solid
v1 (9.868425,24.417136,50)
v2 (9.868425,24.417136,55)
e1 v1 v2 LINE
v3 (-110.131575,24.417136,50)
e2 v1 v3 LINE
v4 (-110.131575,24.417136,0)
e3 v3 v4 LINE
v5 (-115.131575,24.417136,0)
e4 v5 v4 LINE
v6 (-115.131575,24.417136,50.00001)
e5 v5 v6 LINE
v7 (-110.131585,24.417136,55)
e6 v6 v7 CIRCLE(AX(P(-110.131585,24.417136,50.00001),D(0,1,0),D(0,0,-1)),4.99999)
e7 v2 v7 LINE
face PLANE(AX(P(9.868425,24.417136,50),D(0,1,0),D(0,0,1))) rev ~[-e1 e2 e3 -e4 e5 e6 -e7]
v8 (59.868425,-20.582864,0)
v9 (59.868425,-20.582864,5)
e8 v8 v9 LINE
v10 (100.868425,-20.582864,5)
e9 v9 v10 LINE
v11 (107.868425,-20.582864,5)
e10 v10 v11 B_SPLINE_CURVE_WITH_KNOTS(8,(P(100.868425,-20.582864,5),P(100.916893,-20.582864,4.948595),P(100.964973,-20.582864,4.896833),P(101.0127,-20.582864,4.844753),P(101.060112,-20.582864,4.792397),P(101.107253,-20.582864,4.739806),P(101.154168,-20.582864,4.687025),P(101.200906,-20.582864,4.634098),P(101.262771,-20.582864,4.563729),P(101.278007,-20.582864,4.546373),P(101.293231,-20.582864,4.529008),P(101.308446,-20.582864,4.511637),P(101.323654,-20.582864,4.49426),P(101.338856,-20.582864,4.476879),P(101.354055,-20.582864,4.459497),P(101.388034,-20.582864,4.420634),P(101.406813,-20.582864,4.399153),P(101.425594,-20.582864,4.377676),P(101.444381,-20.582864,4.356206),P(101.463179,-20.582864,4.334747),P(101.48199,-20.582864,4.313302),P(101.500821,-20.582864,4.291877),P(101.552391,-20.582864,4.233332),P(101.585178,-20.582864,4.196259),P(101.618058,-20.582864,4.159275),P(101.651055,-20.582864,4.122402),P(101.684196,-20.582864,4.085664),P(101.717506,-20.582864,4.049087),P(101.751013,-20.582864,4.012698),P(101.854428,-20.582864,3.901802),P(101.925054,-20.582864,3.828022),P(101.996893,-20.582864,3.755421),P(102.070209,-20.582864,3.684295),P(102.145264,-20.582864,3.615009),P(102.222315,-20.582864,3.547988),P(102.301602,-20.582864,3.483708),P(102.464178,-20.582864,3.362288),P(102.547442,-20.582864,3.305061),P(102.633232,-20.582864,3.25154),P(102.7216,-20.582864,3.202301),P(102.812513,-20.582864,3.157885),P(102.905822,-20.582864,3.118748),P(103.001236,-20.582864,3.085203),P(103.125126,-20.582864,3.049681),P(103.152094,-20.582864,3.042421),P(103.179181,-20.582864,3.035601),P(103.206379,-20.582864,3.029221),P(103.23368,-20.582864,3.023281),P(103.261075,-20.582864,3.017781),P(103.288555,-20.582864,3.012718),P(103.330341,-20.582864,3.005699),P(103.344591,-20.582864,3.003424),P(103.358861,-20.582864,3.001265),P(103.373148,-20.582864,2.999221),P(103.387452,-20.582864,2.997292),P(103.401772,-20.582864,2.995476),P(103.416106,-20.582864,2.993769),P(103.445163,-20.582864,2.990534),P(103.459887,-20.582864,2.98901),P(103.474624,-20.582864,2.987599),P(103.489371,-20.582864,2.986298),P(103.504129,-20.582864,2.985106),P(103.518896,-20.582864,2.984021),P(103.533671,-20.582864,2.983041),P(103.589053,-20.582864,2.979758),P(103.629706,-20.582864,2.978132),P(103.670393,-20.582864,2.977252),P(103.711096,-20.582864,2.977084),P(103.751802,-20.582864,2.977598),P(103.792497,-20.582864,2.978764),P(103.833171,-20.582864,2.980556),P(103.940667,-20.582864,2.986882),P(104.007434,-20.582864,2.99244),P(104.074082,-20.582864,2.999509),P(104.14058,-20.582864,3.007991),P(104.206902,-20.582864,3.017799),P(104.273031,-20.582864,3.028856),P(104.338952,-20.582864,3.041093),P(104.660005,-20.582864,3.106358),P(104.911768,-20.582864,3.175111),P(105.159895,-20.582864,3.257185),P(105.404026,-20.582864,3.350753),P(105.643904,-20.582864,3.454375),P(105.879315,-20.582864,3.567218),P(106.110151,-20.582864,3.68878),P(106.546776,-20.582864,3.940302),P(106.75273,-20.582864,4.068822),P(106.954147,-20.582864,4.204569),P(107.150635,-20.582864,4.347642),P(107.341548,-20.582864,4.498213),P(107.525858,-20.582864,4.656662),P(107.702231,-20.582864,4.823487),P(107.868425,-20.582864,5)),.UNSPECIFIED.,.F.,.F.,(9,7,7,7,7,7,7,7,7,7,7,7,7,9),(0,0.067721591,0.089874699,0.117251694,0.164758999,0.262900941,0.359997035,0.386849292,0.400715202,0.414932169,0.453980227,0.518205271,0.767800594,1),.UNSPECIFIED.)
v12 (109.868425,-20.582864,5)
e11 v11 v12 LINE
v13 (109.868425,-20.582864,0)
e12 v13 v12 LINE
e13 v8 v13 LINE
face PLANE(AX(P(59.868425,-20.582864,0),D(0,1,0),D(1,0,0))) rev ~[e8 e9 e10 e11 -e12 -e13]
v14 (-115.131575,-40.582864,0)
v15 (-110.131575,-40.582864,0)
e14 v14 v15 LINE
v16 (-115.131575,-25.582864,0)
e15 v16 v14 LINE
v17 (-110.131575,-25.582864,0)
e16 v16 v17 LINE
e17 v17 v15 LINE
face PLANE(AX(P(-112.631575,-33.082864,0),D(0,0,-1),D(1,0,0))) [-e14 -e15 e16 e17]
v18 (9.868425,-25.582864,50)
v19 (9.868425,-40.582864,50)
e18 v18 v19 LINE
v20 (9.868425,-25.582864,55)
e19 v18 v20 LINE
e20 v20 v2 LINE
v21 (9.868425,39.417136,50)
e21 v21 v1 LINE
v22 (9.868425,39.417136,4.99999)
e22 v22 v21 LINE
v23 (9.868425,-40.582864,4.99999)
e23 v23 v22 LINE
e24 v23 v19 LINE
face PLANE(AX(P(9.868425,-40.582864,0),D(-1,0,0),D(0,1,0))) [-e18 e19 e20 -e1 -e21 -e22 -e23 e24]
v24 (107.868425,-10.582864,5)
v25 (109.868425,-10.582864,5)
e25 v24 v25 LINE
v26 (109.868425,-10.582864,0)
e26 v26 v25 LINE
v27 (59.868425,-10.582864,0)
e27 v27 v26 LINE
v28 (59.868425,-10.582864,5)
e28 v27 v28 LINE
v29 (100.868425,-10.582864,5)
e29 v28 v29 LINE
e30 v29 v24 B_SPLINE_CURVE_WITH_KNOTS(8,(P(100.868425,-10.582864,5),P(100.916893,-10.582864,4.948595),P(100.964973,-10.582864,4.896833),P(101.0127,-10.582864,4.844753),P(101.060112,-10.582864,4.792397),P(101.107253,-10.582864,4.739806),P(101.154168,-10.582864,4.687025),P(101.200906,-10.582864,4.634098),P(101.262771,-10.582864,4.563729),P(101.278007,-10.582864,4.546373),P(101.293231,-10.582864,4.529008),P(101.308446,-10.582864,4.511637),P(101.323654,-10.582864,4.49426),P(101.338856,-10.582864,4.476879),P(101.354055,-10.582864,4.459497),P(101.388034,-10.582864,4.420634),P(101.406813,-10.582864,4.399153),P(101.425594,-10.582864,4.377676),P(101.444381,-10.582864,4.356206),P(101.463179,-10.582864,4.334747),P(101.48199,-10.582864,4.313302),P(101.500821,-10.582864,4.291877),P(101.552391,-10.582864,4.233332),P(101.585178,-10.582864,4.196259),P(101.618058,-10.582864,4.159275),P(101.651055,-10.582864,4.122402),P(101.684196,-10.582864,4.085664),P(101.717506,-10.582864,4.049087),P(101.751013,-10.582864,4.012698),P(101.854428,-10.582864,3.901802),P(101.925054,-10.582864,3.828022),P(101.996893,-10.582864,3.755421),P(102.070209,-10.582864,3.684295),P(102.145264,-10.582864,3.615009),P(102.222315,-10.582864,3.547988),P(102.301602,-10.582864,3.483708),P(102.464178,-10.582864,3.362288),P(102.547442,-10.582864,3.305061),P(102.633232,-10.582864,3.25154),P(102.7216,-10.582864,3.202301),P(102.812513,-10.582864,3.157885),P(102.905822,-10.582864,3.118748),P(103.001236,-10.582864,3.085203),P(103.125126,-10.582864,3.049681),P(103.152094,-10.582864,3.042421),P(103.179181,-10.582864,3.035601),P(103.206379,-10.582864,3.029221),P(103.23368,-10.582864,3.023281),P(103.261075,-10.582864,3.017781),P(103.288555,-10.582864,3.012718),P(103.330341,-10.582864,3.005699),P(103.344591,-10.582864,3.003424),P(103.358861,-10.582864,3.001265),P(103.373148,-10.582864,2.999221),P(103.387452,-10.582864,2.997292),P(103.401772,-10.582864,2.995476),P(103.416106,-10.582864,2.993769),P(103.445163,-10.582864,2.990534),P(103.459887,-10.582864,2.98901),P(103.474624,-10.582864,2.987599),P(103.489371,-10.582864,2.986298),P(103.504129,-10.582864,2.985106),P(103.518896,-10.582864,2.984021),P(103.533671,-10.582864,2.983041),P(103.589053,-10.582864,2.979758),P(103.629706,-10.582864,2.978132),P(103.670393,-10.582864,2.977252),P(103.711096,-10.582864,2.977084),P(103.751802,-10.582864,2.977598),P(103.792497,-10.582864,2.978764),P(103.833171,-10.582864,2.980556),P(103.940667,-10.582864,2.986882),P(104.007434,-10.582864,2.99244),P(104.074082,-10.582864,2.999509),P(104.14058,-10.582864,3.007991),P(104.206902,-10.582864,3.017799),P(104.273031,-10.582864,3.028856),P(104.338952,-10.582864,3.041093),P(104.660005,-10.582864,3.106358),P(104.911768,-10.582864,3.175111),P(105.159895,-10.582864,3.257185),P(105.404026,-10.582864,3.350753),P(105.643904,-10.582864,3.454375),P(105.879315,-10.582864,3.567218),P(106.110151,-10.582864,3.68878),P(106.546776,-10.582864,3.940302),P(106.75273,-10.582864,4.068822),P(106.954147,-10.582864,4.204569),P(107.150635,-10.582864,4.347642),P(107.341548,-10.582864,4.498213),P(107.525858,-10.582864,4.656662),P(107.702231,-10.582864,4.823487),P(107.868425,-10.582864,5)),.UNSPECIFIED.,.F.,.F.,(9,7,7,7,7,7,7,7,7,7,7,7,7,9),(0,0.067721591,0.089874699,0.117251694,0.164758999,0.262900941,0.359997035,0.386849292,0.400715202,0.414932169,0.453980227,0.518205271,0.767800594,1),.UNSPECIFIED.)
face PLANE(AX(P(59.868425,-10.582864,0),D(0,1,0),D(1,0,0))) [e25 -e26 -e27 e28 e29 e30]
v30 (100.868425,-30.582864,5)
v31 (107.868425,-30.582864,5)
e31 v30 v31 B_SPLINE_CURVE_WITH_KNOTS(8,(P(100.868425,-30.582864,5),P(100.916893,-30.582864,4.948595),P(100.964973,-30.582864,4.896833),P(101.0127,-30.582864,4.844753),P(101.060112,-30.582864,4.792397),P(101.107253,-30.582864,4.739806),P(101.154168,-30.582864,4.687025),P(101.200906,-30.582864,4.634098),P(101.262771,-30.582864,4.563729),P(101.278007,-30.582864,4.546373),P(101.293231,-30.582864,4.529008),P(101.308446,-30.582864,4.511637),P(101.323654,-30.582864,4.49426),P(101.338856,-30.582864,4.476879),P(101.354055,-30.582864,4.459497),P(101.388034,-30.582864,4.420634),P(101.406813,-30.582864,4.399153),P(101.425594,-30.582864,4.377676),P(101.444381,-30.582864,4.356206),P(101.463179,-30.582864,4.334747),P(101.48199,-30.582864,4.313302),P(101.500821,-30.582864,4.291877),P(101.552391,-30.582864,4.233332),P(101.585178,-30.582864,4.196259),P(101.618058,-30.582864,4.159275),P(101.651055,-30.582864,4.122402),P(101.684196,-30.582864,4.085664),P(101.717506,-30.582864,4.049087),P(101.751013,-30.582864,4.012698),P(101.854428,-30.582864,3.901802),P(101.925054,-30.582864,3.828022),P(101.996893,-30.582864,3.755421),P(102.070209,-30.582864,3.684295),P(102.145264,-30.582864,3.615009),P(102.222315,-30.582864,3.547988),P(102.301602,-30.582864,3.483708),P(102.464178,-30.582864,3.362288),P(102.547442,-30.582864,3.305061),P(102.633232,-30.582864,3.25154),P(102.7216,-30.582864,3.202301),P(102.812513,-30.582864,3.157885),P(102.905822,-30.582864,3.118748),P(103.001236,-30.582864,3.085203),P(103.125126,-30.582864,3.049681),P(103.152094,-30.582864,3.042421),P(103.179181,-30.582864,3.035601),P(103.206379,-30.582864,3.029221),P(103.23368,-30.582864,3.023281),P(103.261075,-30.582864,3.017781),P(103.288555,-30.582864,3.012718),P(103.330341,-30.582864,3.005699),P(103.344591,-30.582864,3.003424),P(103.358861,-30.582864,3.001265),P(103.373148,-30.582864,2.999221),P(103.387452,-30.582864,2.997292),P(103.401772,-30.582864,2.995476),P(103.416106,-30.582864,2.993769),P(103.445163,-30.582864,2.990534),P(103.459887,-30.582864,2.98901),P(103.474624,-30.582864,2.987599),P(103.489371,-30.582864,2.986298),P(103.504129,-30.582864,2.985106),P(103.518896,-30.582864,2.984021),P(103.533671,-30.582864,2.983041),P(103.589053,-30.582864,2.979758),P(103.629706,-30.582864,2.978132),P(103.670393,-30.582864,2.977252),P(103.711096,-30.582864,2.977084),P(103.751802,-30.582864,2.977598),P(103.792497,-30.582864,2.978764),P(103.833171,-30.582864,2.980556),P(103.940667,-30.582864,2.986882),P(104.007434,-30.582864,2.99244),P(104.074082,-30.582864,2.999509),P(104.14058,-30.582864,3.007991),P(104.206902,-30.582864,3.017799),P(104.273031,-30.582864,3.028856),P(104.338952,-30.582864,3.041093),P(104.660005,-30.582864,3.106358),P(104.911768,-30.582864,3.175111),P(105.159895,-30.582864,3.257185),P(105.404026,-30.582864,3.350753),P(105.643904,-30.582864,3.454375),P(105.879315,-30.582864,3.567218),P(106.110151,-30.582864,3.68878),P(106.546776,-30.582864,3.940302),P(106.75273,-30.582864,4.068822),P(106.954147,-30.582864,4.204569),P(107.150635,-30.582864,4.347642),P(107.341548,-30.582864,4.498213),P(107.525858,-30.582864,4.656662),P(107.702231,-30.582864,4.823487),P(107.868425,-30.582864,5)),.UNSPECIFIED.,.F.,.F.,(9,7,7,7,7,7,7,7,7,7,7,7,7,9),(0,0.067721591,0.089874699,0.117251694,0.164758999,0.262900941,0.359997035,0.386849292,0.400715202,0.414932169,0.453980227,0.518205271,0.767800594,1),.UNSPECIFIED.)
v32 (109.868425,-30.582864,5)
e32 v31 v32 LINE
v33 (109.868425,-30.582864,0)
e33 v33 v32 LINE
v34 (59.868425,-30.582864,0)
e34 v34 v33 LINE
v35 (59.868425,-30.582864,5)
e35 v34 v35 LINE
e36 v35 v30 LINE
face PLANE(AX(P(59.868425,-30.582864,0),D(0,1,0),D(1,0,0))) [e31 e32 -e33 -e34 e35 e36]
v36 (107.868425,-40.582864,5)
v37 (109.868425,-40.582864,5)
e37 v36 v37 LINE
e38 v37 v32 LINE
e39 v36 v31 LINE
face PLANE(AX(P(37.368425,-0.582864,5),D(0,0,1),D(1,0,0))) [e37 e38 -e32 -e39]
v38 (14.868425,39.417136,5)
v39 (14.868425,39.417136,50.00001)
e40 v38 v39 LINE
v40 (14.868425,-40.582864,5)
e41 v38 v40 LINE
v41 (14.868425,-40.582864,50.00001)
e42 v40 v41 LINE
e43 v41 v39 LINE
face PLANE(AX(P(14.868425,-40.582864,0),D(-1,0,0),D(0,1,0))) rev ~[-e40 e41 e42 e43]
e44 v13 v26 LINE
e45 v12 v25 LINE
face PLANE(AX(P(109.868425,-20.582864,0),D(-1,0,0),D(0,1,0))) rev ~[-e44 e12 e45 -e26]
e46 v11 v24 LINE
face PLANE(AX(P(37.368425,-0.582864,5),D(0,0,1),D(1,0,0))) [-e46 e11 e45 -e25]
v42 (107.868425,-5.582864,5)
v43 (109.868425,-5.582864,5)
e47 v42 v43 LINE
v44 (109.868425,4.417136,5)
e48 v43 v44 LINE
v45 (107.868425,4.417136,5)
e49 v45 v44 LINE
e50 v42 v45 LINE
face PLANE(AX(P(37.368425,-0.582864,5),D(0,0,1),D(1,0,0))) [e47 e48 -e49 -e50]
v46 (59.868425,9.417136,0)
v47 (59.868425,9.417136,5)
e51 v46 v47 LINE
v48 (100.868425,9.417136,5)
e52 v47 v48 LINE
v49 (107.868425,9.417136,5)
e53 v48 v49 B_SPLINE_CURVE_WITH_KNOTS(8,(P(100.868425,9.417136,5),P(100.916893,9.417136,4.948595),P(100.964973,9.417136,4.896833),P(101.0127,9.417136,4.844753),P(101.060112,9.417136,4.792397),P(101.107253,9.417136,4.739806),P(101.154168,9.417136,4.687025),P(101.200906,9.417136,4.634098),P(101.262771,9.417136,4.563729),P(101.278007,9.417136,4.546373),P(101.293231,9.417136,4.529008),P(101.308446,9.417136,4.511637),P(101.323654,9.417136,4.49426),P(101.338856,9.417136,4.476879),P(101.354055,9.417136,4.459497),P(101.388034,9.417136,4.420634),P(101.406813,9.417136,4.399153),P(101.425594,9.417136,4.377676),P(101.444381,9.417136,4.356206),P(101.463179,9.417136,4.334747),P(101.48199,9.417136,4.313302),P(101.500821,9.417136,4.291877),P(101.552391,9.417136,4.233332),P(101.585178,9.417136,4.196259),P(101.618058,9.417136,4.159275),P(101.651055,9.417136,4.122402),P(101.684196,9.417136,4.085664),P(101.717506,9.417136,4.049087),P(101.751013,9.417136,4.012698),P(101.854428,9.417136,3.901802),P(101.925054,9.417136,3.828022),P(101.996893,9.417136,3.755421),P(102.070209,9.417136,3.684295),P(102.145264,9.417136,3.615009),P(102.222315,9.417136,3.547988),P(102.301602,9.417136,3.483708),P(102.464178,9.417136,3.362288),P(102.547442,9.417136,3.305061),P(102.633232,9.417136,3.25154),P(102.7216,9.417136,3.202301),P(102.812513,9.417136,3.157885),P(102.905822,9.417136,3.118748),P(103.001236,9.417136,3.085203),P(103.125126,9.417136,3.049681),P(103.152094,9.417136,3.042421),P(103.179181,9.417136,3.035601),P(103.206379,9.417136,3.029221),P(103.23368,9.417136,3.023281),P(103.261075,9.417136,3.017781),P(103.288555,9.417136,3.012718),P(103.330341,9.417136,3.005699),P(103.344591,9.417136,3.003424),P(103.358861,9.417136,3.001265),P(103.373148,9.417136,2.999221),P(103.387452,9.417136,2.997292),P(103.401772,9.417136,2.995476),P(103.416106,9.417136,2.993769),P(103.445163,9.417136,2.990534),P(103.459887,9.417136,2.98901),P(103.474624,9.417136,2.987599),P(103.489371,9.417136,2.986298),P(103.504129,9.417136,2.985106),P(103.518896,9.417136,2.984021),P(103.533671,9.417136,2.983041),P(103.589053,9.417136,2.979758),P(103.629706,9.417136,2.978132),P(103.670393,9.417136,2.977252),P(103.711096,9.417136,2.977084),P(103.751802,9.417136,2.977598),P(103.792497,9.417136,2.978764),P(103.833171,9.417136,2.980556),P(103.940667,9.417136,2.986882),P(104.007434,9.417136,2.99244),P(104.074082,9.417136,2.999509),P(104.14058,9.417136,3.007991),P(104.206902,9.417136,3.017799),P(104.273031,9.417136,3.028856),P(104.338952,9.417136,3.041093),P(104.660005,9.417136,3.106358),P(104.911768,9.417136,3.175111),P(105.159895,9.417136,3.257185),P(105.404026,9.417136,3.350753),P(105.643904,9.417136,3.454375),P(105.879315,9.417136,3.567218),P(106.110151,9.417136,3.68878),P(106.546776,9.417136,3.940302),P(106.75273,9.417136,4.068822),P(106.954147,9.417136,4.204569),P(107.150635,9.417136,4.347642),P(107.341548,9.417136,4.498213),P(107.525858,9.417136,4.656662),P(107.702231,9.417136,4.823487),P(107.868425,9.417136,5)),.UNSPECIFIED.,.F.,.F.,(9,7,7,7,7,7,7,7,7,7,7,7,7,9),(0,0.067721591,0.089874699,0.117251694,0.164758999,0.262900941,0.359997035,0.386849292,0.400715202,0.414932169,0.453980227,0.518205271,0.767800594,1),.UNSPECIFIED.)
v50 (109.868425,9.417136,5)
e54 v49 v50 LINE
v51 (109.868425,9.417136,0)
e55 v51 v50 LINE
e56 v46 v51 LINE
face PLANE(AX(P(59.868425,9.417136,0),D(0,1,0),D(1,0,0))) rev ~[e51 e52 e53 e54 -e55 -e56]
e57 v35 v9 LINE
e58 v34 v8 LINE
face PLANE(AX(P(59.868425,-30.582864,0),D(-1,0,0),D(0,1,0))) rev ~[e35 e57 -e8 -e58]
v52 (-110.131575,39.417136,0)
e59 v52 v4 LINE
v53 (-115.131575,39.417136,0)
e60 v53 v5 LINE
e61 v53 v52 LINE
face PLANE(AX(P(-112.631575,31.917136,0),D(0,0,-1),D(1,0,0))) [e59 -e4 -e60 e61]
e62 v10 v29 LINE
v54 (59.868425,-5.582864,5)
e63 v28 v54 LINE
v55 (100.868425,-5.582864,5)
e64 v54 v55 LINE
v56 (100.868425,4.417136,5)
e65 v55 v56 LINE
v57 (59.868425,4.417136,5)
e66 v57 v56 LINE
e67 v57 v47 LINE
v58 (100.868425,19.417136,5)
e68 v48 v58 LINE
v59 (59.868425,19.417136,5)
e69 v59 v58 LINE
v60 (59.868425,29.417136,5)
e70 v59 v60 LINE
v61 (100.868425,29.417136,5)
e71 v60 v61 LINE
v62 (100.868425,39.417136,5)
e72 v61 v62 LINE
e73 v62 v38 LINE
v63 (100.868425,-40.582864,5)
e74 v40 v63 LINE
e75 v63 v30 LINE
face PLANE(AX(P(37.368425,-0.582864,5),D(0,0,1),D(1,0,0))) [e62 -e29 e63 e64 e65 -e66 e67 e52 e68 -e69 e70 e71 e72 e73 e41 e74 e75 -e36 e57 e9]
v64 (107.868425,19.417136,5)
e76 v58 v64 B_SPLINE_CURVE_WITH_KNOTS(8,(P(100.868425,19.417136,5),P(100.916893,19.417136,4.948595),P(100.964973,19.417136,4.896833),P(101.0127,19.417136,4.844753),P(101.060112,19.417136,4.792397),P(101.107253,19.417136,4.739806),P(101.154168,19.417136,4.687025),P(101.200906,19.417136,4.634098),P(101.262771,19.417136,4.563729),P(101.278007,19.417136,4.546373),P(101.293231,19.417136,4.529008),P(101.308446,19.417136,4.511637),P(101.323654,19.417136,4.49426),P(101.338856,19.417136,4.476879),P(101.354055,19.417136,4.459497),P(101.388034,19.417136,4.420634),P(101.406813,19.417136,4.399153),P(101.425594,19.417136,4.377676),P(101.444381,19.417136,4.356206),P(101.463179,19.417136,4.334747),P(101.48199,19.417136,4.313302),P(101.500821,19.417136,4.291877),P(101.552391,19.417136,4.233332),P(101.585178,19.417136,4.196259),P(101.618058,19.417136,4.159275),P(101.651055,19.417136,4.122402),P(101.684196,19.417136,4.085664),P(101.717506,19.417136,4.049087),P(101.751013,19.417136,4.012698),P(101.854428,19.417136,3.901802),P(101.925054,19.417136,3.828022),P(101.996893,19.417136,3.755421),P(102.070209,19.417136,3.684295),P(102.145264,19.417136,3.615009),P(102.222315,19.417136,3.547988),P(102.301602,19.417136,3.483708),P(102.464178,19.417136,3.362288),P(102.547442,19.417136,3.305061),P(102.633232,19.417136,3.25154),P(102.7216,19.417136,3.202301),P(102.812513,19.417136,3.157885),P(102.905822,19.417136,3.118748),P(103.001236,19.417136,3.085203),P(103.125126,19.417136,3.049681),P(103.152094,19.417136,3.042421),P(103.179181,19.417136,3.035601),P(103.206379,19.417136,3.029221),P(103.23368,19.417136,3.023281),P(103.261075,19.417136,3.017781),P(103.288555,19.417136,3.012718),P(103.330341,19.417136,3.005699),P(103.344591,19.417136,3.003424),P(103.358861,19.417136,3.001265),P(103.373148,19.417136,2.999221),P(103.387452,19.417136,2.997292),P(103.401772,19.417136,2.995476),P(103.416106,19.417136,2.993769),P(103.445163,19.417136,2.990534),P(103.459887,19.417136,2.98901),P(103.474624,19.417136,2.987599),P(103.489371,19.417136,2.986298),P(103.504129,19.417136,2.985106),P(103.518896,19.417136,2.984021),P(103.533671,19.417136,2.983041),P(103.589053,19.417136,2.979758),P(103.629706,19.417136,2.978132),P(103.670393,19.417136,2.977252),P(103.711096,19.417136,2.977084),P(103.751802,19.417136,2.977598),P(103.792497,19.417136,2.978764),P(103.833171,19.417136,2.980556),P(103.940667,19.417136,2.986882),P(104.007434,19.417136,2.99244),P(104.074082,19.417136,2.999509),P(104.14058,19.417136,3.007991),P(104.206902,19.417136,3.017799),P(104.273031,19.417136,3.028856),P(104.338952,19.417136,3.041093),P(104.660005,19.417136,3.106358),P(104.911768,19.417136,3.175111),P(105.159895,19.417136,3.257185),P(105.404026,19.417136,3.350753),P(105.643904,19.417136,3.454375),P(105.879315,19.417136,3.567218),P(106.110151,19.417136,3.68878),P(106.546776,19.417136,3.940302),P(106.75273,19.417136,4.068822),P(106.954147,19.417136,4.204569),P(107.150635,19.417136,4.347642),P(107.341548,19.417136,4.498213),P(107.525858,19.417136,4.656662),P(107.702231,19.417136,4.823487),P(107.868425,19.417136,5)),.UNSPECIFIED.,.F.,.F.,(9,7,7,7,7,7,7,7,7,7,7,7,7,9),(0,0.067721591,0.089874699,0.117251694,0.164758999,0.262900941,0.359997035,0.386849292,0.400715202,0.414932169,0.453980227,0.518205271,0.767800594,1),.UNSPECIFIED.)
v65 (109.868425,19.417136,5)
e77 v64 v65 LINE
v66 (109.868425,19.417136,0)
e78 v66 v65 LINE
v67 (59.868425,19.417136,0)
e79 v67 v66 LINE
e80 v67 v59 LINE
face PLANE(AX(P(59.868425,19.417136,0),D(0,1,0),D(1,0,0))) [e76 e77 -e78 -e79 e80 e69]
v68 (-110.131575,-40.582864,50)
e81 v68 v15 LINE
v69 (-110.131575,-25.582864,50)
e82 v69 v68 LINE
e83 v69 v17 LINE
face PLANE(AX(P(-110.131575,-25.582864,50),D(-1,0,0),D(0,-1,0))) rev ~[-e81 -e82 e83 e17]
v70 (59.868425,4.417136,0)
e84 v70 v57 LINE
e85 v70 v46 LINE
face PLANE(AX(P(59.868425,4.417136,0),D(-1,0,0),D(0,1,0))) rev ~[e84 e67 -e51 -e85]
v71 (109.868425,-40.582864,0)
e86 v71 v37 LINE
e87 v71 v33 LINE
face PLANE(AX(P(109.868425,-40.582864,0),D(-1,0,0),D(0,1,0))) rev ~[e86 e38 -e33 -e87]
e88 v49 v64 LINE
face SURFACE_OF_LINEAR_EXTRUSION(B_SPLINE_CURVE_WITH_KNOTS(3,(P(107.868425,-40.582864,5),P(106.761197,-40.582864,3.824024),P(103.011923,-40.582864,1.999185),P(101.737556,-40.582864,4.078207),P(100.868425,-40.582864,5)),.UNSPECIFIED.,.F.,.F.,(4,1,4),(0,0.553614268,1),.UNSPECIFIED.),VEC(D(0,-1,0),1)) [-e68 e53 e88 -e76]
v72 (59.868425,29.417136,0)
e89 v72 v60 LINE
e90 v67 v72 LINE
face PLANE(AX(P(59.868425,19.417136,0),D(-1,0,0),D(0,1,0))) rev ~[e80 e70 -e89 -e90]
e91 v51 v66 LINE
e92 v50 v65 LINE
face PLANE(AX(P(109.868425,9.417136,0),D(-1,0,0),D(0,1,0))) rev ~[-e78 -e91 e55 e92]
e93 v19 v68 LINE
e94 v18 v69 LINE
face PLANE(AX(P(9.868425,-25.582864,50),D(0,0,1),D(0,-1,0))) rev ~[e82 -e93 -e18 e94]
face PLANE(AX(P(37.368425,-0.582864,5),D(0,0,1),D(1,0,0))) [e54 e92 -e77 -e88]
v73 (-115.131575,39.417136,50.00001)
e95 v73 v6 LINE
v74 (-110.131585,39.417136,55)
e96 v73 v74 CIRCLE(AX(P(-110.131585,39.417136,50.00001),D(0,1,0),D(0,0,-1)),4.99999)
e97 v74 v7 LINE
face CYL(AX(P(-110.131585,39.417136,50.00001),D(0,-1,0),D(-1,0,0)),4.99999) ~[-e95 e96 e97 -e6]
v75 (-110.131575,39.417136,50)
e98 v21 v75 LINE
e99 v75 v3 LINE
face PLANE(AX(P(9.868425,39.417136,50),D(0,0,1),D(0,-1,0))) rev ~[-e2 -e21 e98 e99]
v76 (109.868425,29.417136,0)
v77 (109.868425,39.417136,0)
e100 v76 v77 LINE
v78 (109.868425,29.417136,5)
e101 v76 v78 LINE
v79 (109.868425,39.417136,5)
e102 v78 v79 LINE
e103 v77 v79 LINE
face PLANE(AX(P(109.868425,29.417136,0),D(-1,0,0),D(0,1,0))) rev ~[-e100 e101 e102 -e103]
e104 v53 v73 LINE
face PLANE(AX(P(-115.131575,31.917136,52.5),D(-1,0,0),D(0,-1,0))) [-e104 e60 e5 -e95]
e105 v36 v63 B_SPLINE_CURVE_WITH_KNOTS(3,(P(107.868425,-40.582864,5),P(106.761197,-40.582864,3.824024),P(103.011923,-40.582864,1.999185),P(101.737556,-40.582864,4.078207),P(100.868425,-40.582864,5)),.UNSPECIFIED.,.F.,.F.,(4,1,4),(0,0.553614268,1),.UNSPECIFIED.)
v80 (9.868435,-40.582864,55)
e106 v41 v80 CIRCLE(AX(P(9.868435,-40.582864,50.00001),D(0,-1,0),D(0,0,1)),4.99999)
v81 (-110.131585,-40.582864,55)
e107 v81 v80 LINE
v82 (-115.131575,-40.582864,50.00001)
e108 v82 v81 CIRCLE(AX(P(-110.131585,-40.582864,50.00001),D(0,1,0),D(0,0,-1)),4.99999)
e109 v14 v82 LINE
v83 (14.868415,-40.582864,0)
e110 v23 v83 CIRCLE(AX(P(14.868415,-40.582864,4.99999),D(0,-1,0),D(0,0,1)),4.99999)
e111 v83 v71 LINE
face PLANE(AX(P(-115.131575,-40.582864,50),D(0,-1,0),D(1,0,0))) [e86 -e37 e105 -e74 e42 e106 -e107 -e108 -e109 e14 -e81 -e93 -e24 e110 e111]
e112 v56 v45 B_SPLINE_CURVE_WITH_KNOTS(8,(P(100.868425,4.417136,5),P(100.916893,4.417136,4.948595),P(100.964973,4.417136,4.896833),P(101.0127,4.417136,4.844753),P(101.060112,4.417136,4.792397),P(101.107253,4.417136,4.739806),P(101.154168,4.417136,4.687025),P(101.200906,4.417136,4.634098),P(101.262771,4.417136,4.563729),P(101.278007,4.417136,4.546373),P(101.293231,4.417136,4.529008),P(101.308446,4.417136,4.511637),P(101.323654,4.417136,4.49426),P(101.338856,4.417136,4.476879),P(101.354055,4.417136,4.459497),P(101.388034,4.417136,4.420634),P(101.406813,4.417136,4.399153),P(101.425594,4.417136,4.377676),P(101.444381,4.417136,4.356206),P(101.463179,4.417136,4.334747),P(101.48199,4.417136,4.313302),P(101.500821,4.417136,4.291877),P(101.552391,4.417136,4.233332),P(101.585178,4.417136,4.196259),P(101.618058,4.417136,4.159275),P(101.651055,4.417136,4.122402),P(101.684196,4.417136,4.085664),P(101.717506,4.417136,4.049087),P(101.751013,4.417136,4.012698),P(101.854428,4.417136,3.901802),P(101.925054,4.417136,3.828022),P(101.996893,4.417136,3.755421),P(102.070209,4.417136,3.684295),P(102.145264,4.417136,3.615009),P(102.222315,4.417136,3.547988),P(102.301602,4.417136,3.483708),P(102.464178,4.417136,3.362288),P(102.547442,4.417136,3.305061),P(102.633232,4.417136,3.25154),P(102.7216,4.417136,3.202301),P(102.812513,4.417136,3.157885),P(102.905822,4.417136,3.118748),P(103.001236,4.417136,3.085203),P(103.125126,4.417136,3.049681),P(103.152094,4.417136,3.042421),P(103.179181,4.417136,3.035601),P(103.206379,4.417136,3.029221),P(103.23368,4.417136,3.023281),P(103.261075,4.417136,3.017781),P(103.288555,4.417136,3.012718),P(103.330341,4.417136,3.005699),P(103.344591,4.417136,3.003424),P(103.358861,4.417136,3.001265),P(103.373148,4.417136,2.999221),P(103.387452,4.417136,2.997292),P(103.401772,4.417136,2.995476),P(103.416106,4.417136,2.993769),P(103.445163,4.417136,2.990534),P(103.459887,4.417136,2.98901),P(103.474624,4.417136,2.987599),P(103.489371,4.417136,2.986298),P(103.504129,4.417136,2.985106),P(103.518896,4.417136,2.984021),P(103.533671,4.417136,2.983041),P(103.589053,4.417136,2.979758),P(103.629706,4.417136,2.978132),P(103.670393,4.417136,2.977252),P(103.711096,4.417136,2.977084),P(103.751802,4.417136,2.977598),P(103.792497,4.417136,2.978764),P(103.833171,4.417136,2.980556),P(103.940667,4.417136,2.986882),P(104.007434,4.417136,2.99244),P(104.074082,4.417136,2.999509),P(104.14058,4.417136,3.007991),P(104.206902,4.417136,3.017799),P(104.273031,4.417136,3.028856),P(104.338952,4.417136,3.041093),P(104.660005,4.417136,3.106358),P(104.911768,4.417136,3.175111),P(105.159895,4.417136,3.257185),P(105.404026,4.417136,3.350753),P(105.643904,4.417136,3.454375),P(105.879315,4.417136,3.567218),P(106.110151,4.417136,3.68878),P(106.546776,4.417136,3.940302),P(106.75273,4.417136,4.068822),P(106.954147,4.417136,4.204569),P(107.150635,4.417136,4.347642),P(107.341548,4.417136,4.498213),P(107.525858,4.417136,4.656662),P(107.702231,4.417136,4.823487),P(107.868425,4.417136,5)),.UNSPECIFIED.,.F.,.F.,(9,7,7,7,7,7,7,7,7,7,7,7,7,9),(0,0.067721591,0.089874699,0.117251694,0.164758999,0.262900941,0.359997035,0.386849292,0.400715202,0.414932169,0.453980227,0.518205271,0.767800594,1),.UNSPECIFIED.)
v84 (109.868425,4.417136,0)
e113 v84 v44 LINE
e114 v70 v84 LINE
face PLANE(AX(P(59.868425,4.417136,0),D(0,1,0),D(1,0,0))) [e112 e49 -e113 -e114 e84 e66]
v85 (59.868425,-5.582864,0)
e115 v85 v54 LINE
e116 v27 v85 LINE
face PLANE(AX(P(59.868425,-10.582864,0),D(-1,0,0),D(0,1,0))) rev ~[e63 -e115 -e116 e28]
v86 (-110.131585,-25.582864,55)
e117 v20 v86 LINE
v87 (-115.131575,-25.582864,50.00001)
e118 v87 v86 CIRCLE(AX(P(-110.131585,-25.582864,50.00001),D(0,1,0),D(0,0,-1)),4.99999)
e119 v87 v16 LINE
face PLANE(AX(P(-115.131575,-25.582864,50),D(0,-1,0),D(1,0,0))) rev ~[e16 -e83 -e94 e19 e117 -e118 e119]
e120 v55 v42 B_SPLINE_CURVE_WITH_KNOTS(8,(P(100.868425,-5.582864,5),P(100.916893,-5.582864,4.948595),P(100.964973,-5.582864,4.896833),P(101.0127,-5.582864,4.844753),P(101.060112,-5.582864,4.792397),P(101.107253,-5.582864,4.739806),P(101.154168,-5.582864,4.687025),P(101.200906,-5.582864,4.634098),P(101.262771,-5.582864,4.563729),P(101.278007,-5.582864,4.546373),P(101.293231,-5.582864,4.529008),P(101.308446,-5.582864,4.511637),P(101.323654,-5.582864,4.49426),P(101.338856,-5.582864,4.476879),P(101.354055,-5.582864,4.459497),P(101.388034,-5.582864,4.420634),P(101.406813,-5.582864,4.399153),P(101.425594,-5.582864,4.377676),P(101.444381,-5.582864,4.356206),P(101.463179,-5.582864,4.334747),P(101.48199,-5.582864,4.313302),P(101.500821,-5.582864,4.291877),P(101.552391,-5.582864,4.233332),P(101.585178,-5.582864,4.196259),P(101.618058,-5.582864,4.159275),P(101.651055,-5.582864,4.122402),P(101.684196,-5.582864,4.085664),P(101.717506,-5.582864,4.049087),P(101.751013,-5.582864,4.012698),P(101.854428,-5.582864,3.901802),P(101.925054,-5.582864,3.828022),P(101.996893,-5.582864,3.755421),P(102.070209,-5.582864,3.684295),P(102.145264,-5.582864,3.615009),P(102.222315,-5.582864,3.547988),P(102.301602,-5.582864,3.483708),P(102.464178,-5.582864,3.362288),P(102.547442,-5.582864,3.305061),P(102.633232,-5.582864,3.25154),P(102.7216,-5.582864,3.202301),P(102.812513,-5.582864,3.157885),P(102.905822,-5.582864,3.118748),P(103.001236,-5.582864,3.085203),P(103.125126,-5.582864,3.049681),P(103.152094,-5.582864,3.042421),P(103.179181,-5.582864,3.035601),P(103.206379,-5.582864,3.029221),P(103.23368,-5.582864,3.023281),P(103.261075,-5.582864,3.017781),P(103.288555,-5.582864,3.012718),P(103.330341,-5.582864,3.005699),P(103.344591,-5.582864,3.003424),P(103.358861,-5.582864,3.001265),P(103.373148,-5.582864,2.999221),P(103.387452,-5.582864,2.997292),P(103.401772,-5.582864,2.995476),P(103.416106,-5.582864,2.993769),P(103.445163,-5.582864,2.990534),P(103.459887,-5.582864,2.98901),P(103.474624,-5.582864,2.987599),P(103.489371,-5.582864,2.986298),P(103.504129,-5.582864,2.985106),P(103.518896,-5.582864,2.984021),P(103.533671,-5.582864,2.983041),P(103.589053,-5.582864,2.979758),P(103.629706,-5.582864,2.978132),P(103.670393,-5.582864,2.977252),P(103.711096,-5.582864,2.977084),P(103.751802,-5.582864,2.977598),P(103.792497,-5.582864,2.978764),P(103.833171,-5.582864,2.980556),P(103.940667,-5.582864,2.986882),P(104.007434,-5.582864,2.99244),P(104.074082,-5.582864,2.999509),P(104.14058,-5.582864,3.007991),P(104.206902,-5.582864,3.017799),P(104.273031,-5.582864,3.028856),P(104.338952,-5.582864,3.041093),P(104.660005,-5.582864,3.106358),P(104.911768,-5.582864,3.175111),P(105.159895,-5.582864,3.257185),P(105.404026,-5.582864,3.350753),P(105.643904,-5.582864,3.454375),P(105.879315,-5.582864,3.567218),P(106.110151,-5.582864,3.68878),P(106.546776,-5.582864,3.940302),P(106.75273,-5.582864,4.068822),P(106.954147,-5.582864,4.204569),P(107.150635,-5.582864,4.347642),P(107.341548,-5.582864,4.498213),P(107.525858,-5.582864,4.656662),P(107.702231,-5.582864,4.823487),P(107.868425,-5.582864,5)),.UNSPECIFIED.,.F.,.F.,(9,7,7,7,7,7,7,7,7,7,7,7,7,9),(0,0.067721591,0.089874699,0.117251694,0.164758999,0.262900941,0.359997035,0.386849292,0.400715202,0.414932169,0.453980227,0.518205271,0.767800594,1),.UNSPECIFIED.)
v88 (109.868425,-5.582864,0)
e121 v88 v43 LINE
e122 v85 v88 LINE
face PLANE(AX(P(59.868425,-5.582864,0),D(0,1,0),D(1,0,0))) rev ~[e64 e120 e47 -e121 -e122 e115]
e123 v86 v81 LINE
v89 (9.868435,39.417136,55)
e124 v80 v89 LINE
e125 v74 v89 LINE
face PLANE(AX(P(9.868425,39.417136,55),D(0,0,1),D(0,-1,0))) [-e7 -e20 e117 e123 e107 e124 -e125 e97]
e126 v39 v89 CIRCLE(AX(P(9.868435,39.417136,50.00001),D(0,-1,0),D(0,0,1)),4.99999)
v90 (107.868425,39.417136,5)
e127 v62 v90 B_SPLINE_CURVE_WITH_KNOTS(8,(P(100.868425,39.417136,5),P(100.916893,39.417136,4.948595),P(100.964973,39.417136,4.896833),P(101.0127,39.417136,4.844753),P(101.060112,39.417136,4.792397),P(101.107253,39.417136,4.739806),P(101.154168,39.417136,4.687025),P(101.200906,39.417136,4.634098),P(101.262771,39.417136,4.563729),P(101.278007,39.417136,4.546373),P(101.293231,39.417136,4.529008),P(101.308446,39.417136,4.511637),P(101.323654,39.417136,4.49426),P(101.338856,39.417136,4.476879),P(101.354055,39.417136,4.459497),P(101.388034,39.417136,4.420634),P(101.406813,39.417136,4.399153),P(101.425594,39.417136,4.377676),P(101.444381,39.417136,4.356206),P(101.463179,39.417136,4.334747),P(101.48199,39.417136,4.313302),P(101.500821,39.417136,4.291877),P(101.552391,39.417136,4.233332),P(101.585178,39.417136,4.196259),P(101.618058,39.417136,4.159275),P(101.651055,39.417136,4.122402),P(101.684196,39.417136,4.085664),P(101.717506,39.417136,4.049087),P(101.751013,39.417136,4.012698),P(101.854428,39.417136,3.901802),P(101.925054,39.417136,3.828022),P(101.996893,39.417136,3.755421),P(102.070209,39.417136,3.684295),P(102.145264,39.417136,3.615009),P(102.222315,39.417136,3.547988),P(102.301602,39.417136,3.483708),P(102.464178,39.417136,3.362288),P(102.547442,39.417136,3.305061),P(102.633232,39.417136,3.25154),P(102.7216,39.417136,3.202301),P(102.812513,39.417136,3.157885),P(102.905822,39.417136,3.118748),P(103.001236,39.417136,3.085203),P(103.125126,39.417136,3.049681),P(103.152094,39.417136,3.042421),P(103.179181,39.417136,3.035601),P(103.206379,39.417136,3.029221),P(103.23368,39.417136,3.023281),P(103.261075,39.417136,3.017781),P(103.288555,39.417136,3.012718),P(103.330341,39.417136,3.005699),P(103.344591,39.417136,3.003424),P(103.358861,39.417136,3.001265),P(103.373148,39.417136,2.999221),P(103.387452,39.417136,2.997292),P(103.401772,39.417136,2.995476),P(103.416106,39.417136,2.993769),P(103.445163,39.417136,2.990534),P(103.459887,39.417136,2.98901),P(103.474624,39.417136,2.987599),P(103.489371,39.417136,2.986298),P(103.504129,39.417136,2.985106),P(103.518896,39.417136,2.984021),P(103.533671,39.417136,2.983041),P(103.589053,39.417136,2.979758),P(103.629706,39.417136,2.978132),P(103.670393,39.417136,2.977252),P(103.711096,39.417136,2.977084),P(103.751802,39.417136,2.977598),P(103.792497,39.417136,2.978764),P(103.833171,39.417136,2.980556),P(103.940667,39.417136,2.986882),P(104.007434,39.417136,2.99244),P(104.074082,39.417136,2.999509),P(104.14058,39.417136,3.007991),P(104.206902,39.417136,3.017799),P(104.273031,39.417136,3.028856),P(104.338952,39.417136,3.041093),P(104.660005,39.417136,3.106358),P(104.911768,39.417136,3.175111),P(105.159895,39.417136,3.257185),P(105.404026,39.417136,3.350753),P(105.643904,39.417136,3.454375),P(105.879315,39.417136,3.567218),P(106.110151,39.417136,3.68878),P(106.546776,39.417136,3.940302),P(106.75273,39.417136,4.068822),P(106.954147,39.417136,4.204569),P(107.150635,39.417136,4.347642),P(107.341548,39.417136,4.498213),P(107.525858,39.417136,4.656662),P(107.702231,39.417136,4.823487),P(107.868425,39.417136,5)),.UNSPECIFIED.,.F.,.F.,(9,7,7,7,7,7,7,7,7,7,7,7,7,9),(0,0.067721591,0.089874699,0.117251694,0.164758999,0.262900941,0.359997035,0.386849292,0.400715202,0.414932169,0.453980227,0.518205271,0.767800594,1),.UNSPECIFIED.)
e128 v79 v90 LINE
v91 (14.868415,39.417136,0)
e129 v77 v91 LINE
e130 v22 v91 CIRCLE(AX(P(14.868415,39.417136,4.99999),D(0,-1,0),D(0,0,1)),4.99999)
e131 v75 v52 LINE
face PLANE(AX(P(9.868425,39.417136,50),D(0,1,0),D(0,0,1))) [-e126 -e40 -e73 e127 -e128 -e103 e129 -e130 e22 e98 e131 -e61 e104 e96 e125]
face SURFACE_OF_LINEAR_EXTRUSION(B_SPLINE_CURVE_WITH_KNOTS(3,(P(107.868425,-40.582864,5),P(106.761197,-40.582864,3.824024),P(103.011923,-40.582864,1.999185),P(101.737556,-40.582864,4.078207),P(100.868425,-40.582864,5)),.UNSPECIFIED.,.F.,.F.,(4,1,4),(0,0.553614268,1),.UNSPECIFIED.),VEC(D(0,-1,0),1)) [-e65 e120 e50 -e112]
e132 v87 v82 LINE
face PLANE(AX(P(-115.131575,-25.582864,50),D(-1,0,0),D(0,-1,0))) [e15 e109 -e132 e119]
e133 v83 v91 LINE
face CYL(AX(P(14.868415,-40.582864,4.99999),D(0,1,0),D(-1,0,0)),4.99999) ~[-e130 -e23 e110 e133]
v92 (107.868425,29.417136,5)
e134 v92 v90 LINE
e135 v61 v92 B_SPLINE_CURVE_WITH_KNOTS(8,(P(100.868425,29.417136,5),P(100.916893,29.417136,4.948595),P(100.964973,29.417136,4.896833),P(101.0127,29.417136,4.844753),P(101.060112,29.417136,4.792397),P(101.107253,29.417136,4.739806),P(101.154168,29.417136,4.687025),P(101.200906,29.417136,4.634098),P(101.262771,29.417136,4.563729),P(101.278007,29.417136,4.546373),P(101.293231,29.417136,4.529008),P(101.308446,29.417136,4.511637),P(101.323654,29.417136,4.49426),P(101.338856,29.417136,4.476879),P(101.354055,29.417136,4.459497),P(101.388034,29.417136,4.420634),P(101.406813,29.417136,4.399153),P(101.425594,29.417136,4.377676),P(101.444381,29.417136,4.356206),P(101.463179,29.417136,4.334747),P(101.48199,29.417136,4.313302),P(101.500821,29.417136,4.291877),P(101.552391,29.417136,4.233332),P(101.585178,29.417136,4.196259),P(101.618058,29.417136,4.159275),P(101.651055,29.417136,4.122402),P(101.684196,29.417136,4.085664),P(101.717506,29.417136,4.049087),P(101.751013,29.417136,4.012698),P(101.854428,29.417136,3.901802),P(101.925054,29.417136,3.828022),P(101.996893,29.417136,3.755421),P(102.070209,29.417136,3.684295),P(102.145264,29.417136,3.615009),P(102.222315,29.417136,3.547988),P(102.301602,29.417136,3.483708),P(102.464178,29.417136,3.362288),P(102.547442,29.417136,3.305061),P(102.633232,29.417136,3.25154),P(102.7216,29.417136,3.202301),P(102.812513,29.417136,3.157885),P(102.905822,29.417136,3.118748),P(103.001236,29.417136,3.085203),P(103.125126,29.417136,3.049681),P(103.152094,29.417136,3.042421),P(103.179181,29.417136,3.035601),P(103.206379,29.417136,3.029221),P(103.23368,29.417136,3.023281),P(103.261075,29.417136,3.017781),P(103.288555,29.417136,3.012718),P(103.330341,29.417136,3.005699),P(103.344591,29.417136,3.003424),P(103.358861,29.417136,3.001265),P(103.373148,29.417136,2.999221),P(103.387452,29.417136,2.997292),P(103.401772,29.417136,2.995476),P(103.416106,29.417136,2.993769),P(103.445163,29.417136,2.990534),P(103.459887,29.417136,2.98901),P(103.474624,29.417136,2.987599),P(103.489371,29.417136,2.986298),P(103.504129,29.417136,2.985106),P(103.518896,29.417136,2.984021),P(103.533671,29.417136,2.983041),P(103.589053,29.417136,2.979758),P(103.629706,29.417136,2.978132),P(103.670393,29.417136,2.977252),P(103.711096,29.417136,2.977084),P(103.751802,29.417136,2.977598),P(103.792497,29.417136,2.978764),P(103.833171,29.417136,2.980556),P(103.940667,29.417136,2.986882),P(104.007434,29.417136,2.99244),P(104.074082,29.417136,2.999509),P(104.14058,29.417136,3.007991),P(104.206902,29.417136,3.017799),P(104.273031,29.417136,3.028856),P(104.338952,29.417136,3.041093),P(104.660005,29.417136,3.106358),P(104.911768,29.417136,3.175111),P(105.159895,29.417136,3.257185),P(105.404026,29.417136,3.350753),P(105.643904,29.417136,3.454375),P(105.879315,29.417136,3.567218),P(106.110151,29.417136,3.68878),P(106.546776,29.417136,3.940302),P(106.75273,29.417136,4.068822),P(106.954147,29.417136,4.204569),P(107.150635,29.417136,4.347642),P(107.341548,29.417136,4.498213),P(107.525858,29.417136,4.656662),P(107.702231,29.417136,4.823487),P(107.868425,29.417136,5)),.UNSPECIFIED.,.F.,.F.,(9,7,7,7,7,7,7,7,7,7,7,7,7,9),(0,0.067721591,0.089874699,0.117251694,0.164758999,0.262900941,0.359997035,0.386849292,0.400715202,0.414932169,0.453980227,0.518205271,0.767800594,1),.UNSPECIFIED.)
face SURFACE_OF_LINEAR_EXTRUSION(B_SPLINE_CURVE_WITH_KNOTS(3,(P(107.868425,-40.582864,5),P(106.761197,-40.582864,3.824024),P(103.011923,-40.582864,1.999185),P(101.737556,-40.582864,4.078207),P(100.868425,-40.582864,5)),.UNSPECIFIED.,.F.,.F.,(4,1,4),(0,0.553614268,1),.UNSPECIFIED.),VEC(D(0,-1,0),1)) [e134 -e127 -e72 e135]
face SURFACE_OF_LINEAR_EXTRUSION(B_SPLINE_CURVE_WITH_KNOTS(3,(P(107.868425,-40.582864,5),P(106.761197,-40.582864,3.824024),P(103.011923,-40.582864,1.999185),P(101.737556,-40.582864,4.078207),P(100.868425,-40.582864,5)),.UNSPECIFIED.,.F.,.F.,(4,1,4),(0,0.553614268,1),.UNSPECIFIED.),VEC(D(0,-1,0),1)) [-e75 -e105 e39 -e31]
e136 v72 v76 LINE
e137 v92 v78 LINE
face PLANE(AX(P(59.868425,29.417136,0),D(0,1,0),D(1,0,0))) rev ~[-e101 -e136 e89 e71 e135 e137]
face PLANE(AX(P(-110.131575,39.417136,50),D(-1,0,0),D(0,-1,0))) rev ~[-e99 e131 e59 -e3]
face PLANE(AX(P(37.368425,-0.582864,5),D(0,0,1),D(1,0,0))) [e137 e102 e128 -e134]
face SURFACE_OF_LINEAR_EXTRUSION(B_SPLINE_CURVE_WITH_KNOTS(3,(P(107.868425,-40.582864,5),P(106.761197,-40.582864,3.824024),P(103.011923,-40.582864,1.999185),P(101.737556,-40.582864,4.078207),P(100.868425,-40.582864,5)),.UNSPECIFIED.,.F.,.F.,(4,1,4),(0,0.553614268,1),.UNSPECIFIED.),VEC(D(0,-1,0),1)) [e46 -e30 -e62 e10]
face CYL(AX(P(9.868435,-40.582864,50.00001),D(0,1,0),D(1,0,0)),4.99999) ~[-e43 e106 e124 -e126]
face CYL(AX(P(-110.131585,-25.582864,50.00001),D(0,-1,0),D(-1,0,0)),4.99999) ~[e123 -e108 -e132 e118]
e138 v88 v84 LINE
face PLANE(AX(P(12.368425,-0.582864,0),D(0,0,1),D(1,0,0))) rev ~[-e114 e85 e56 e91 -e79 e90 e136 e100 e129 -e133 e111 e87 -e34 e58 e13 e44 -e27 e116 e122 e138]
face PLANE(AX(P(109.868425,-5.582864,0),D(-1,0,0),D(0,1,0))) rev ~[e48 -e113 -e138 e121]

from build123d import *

# Parameters (mm, degrees)
F0_W      = 50
F0_H      = 10
F1_DEPTH  = 5
F0_W_2    = 5
F0_H_2    = 80
F2_DEPTH  = 55
F3_W      = 15
F3_H      = 5
F4_DEPTH  = 125
F6_W      = 5
F6_H      = 15
F5_W      = 5
F5_H      = 15
F7_DEPTH  = 50
F8_R      = 4.99999
F10_DEPTH = 80.001


# Not quite as in the source:
# - a fillet or chamfer is up to 0.001 mm smaller than in the source, because OpenCascade refuses the exact size


with BuildPart() as f1:
    # F0 (on Top) → F1 (new body)
    with BuildSketch(Plane.XY):
        Polygon((59.8684251308, 39.4171364857), (14.8684251308, 39.4171364857), (14.8684251308, -40.5828635143), (59.8684251308, -40.5828635143), (59.8684251308, -30.5828635143), (59.8684251308, -20.5828635143), (59.8684251308, -10.5828635143), (59.8684251308, -5.5828635143), (59.8684251308, 4.4171364857), (59.8684251308, 9.4171364857), (59.8684251308, 19.4171364857), (59.8684251308, 29.4171364857), align=None)
        with Locations((84.8684251308, -0.5828635143)):
            Rectangle(F0_W, F0_H)
        with Locations((84.8684251308, -35.5828635143)):
            Rectangle(F0_W, F0_H)
        with Locations((84.8684251308, 14.4171364857)):
            Rectangle(F0_W, F0_H)
        with Locations((84.8684251308, 34.4171364857)):
            Rectangle(F0_W, F0_H)
        with Locations((84.8684251308, -15.5828635143)):
            Rectangle(F0_W, F0_H)
    extrude(amount=F1_DEPTH)

    # F0 (on Top) → F2 (join)
    with BuildSketch(Plane.XY):
        with Locations((12.3684251308, -0.5828635143)):
            Rectangle(F0_W_2, F0_H_2)
    extrude(amount=F2_DEPTH)

    # F3 (on face) → F4 (join)
    with BuildSketch(Plane(origin=(9.8684251308, 0, 0), x_dir=(0, -1, 0), z_dir=(-1, 0, 0))):
        with Locations((-31.9171364857, 52.5)):
            Rectangle(F3_W, F3_H)
        with Locations((33.0828635143, 52.5)):
            Rectangle(F3_W, F3_H)
    extrude(amount=F4_DEPTH)

    # F6 (on face) + F5 (on face) → F7 (join)
    with BuildSketch(Plane(origin=(0, 0, 50), x_dir=(1, 0, 0), z_dir=(0, 0, -1))):
        with Locations((-112.6315748692, 33.0828635143)):
            Rectangle(F6_W, F6_H)
    with BuildSketch(Plane(origin=(0, 0, 50), x_dir=(1, 0, 0), z_dir=(0, 0, -1))):
        with Locations((-112.6315748692, -31.9171364857)):
            Rectangle(F5_W, F5_H)
    extrude(amount=F7_DEPTH)

    # F8 (radius 5 in the source; OpenCascade refuses exactly that, so slightly less here)
    f8_edges = [f1.edges().sort_by_distance(p)[0] for p in [
        (-115.131575, 31.917136, 55),
        (-115.131575, -33.082864, 55),
        (9.868425, -0.582864, 0),
        (14.868425, -0.582864, 55),
    ]]
    fillet(f8_edges, radius=F8_R)

    # F9 (on face) → F10 (cut, through all)
    with BuildSketch(Plane.XZ.offset(40.5828635143)):
        with BuildLine():
            add(Edge.make_bspline(
                [(107.8684251308, 5), (106.7611965953, 3.8240237002), (103.011923181, 1.9991854383), (101.7375563624, 4.0782074875), (100.8684251308, 5)],
                knots=[0, 0, 0, 0, 0.5536142678, 1, 1, 1, 1], degree=3))
            Line((107.8684251308, 5), (100.8684251308, 5))
        make_face()
    extrude(amount=-F10_DEPTH, mode=Mode.SUBTRACT)


solid = f1.part
